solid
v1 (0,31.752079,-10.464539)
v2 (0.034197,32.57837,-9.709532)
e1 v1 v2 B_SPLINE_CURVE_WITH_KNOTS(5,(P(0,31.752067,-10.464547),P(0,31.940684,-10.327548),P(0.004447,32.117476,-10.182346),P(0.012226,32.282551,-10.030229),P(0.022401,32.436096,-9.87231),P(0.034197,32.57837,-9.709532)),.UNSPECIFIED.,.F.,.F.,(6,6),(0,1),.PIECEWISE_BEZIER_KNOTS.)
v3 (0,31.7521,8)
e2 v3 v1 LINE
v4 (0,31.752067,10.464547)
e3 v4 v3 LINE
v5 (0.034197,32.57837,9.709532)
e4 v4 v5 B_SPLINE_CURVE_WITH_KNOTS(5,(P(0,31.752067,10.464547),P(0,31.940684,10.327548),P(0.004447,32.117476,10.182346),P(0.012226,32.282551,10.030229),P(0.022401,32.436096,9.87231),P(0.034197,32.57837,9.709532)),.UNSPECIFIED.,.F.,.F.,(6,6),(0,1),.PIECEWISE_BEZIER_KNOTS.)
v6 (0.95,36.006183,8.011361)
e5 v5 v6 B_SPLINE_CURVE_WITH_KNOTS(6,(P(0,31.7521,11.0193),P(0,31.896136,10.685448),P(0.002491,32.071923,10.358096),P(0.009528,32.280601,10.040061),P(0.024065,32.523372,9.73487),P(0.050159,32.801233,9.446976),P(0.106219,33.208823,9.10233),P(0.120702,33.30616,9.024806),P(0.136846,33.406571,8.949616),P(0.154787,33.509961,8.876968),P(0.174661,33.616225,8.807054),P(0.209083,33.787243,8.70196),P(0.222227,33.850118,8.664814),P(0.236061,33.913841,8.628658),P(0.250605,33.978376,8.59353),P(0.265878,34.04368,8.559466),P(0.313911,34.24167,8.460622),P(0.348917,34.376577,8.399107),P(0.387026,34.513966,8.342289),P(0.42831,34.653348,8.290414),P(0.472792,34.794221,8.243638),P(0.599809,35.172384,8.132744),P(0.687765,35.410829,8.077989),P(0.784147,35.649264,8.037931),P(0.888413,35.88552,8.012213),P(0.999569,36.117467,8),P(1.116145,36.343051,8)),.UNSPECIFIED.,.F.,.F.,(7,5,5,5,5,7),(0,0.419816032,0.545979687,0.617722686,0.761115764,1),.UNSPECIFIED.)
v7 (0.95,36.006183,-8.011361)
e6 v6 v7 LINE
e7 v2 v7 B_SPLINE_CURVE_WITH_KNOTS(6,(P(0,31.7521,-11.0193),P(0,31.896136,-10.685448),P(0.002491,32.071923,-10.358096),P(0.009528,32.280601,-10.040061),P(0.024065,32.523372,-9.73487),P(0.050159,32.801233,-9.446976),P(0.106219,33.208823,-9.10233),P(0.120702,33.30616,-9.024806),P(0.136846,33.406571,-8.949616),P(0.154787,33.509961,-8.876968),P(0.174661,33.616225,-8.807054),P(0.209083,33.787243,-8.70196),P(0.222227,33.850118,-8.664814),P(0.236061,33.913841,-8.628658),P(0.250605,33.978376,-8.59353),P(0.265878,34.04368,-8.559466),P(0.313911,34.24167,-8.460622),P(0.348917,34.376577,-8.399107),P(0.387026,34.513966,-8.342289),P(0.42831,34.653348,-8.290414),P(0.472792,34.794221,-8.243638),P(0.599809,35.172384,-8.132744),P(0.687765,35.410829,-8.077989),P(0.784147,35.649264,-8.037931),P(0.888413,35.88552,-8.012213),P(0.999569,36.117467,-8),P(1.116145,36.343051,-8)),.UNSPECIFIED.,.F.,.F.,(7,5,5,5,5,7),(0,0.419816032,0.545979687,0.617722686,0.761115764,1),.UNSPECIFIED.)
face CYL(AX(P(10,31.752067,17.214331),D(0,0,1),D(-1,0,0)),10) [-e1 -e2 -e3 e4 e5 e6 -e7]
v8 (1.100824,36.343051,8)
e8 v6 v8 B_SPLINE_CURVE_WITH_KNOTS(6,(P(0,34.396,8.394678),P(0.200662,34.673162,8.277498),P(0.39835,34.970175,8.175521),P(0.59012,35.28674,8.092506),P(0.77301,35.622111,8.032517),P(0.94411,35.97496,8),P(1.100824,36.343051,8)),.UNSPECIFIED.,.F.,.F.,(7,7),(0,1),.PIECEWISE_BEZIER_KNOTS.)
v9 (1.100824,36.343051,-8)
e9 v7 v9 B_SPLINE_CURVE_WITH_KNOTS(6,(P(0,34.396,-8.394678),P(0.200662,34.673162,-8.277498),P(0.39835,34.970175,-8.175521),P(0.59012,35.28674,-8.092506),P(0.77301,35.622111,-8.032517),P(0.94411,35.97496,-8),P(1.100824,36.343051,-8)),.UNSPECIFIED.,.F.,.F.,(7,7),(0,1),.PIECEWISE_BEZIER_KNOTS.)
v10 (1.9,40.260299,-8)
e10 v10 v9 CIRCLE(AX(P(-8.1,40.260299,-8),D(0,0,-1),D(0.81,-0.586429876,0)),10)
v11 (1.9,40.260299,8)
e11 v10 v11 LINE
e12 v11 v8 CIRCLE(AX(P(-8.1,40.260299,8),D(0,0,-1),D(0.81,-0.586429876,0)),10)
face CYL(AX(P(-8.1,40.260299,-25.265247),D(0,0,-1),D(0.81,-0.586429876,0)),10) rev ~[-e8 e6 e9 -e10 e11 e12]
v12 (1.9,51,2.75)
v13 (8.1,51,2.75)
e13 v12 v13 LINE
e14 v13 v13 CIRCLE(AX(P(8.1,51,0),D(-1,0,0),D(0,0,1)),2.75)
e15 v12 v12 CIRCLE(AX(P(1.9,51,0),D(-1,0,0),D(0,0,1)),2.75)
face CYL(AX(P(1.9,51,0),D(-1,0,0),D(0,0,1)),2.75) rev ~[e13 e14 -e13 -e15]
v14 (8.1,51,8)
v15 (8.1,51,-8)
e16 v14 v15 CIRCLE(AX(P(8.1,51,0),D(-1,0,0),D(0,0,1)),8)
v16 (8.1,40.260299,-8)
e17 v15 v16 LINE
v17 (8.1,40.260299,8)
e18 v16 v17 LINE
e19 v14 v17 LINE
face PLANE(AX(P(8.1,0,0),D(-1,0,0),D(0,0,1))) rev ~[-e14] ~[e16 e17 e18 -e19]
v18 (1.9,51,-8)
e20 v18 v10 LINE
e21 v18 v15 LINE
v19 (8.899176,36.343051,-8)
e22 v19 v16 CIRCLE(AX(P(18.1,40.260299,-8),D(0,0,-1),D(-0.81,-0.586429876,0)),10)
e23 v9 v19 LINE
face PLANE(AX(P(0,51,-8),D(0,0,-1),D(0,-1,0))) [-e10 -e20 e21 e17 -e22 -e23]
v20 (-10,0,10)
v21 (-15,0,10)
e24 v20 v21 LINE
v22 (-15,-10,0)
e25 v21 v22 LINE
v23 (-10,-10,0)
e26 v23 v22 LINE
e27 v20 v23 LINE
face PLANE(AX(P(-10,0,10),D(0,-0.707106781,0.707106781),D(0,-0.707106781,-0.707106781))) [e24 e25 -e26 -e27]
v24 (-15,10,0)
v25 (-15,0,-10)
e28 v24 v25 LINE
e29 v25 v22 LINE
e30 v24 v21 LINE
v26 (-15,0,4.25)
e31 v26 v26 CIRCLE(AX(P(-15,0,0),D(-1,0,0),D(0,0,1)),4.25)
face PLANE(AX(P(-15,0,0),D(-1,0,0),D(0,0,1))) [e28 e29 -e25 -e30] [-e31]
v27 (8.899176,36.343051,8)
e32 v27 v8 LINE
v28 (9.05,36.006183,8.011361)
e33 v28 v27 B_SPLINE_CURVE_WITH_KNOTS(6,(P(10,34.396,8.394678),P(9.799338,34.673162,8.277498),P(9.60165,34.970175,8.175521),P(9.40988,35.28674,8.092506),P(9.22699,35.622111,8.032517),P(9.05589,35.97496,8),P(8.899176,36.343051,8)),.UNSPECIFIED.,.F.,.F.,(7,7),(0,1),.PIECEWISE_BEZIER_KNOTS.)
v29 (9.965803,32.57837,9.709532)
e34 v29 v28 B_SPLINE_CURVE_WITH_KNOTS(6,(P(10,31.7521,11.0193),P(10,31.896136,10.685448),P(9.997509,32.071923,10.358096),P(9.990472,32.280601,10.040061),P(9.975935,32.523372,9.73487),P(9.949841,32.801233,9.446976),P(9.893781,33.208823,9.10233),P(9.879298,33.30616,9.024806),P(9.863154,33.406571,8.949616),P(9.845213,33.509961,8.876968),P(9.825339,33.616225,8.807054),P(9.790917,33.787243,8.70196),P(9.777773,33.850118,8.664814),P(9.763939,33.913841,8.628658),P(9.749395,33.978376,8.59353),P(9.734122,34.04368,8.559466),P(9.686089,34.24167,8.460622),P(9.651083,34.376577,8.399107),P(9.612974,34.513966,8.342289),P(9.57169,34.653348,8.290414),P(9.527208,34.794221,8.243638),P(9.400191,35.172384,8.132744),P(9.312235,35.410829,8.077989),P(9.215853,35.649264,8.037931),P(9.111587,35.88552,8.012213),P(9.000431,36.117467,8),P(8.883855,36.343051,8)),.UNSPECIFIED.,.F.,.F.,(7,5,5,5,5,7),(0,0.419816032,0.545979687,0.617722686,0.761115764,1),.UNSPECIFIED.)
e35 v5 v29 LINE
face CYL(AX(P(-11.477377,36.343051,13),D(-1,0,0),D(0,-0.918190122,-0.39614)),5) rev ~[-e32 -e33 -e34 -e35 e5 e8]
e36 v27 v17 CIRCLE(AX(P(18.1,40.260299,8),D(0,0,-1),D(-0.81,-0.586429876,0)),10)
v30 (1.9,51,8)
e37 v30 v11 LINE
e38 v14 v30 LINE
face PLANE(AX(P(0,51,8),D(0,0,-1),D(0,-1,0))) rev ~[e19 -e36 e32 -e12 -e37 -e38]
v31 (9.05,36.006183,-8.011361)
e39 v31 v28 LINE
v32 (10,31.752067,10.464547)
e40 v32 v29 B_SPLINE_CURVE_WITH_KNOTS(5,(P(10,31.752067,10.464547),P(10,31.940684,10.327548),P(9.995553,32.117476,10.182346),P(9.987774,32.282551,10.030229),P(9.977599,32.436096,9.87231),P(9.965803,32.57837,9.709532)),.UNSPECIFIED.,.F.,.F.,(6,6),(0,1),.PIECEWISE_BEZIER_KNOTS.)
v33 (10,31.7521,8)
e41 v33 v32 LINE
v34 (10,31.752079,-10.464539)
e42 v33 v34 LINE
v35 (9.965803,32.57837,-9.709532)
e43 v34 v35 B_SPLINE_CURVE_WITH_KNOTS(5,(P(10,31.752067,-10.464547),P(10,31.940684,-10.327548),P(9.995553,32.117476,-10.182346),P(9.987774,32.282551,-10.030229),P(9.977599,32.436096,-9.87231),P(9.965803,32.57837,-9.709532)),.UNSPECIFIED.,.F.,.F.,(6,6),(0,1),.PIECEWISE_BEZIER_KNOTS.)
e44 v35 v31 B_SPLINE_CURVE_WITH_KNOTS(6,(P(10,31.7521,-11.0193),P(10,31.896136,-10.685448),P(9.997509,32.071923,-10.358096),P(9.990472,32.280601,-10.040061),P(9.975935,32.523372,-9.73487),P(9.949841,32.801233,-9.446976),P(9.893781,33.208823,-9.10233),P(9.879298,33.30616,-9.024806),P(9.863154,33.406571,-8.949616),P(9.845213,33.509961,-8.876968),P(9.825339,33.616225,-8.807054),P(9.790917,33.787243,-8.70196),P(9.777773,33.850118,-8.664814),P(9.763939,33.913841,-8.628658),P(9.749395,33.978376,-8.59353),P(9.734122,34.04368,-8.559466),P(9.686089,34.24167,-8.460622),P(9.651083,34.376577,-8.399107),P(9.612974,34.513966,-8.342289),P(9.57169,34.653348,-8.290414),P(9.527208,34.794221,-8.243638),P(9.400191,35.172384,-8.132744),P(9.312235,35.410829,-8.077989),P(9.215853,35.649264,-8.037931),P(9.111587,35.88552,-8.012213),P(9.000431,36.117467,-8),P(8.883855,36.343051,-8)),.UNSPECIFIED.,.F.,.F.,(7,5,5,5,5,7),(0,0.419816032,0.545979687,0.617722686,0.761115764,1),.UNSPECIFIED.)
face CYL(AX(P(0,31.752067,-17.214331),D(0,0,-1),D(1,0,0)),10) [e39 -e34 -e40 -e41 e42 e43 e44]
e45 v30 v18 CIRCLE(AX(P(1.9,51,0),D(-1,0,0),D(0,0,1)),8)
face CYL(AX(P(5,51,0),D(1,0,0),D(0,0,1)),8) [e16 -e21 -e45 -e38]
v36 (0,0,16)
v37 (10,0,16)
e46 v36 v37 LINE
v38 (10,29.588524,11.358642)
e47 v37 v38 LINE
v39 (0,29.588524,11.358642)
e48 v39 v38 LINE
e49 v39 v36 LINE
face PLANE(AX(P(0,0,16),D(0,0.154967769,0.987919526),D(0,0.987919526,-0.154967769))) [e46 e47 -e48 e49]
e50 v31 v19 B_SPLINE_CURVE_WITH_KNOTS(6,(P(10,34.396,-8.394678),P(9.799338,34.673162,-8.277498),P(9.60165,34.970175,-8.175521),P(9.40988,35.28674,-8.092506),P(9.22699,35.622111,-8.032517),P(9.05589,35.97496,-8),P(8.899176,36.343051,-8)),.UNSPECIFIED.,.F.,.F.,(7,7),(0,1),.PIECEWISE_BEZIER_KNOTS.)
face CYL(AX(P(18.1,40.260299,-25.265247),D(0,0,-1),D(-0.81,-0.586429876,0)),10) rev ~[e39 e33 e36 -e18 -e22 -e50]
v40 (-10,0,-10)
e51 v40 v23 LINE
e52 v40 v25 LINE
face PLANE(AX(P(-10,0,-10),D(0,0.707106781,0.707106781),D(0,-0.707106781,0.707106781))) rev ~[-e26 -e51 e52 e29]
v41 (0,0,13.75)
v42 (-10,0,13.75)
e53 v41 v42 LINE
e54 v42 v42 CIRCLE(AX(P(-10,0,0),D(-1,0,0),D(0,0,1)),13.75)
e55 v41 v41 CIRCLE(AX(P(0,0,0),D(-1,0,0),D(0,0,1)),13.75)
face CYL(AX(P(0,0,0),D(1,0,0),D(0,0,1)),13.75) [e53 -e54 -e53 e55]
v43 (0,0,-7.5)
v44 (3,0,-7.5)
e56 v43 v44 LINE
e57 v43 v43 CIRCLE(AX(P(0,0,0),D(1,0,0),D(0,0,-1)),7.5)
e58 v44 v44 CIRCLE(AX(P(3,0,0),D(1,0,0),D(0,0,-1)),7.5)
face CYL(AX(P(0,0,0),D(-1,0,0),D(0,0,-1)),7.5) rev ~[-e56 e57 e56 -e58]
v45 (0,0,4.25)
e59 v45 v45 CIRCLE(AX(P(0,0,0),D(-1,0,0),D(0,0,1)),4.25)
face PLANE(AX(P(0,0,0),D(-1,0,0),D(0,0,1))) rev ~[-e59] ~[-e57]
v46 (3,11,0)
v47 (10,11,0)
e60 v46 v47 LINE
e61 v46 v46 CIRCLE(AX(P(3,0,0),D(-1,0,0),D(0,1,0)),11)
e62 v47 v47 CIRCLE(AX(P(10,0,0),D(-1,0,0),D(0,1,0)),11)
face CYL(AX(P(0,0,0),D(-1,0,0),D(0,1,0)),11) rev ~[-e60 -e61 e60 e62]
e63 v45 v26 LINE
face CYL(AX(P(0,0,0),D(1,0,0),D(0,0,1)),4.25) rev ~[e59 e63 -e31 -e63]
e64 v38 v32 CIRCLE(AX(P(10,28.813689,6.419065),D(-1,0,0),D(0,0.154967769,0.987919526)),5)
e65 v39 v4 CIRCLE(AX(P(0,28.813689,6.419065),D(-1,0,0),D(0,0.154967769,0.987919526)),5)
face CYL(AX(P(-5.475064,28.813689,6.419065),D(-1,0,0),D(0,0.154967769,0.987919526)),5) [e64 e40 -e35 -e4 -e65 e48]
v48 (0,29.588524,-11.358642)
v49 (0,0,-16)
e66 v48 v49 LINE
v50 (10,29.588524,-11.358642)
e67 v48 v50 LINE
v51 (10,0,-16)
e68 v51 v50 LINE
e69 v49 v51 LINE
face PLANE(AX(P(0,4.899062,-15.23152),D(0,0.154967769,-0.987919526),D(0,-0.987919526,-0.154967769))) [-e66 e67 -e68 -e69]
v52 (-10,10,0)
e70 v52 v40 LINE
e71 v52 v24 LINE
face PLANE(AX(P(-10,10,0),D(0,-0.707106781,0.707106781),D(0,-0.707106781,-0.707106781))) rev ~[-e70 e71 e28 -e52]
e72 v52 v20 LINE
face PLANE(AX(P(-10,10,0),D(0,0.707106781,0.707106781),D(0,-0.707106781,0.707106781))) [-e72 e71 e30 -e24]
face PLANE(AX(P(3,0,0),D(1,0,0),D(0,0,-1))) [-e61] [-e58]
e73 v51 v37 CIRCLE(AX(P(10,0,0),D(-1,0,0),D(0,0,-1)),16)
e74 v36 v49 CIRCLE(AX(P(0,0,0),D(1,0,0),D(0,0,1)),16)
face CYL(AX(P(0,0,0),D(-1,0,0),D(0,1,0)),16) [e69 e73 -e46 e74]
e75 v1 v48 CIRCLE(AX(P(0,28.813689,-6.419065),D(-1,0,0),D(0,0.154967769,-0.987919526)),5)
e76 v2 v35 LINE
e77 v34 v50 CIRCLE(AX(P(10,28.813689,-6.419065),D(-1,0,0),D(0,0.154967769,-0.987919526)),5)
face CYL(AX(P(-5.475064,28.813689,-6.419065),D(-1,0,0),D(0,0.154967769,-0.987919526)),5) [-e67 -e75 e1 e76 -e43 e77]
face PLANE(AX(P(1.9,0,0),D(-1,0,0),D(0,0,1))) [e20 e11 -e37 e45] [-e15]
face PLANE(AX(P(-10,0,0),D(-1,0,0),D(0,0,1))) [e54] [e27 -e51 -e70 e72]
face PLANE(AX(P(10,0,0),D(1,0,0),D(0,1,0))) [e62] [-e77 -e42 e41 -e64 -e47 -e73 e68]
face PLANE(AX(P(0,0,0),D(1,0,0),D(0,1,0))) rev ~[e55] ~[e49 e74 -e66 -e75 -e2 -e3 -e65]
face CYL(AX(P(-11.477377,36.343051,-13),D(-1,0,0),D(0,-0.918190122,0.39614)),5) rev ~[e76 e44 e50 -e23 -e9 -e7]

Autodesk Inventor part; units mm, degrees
ref_plane "YZ Plane" through (0, 0, 0) normal (1, 0, 0) x (0, 1, 0)
ref_plane "XZ Plane" through (0, 0, 0) normal (0, 1, 0) x (-1, 0, 0)
sketch "Esquisse1" plane through (0, 0, 0) normal (1, 0, 0) x (0, 1, 0)
  circle A0 centre (0, 0) radius 16
  line L0 (-16, 0) -> (59, 0)
  line L1 (59, 0) -> (51, 0)
  circle A1 centre (51, 0) radius 5
  circle A2 centre (51, 0) radius 8
  line L2 (0, 16) -> (51, 8)
  line L3 (51, -8) -> (0, -16)
  circle A3 centre (0, 0) radius 11
  line L4 (34.396, -10.6045) -> (34.396, 10.6045)
  dimension "d0" = 32
  dimension "d1" = 75
  dimension "d2" = 8
  dimension "d3" = 10
  dimension "d4" = 16
  dimension "d5" = 22
extrude "Extrusion1" add sketch "Esquisse1" along normal blind 10 contours L2 A0 L0 A3 | L0 A3 A0 L3 | L2 L4 L0 A0 | L0 L4 L3 A0
sketch "Esquisse2" plane through (0, 0, 0) normal (-1, 0, 0) x (0, 0, 1)
  circle A0 centre (0, 0) radius 11
  circle A1 centre (0, 0) radius 4.25
  dimension "d8" = 8.5
extrude "Extrusion2" add sketch "Esquisse2" along normal blind 10
sketch "Esquisse3" plane through (-10, 0, 0) normal (-1, 0, 0) x (0, 0, 1)
  line L0 (0, 0) -> (-10, 0)
  circle A0 centre (0, 0) radius 11 projected
  line L1 (0, 0) -> (0, 10)
  circle A1 centre (0, 0) radius 4.25 projected
  line L2 (0, 0) -> (10, 0)
  line L3 (0, 0) -> (0, -10)
  line L4 (0, 10) -> (-10, 0)
  line L5 (0, 10) -> (10, 0)
  line L6 (10, 0) -> (0, -10)
  line L7 (-10, 0) -> (0, -10)
  circle A2 centre (0, 0) radius 4.25
  dimension "d12" = 10
  dimension "d13" = 10
  dimension "d14" = 10
  dimension "d15" = 10
  dimension "d16" = 8.5
extrude "Extrusion3" add sketch "Esquisse3" along normal blind 5 contours A1 L3 L7 L0 | L0 L4 L1 A1 | L1 L5 L2 A1 | L2 L6 L3 A1
sketch "Esquisse4" plane through (0, 0, 0) normal (-1, 0, 0) x (0, 0, 1)
  circle A0 centre (0, 0) radius 13.75
  circle A1 centre (0, 0) radius 11
  dimension "d19" = 27.5
extrude "Extrusion4" add sketch "Esquisse4" along normal up to surface (10 mm away)
ref_plane "Plan de construction1" through (5, 0, 0) normal (-1, 0, 0) x (0, 0, 1)
sketch "Esquisse7" plane through (5, 0, 0) normal (-1, 0, 0) x (0, 0, 1)
  point P0 (0, 0)
sketch "Esquisse8" plane through (5, 0, 0) normal (-1, 0, 0) x (0, 0, 1)
  circle A0 centre (0, 51) radius 5 projected
  circle A1 centre (0, 51) radius 4.25 projected
  line L0 (-16, 0) -> (-10.6045, 34.396) projected
  line L1 (10.6045, 34.396) -> (16, 0) projected
  arc A2 (8, 51) -> (-8, 51) centre (0, 51) ccw projected
  line L2 (-10.6045, 34.396) -> (10.6045, 34.396) projected
  line L3 (-10.6045, 34.396) -> (-8, 51)
  line L4 (8, 51) -> (10.6045, 34.396)
  line L5 (10.6045, 34.396) -> (-10.6045, 34.396)
  point P0 (0, 0)
extrude "Extrusion6" add sketch "Esquisse8" along normal mid plane 6.2 contours A0 | L4 L2 L3 A2
fillet "Congé1" radius 10 4 edges at (8.1, 34.396, 0) (1.9, 34.396, 0) (10, 34.396, 0) (0, 34.396, 0)
sketch "Esquisse10" plane through (0, 0, 0) normal (-1, 0, 0) x (0, 0, 1)
  line L0 (-11.0193, 31.7521) -> (11.0193, 31.7521) projected
  line L1 (-11.0193, 31.7521) -> (11.0193, 31.7521)
  arc A0 (8, 51) -> (-8, 51) centre (0, 51) ccw projected
  line L2 (-8, 51) -> (-8, 31.7521)
  line L3 (9.6847, 40.2603) -> (8, 51) projected
  line L4 (8, 51) -> (8, 31.7521)
  arc A1 (8, 51) -> (-8, 51) centre (0, 51) ccw
  line L5 (-11.0193, 31.7521) -> (-8, 51)
  line L6 (8, 51) -> (11.0193, 31.7521)
  point P0 (0, 0)
extrude "Extrusion8" cut sketch "Esquisse10" against normal blind 10 contours L5 L2 L0 | L4 L3 L6 L0
fillet "Congé2" radius 5 2 edges at (5, 31.7521, -8) (5, 31.7521, -11.0193)
fillet "Congé3" radius 5 2 edges at (5, 31.7521, 11.0193) (5, 31.7521, 8)
sketch "Esquisse11" plane through (0, 0, 0) normal (1, 0, 0) x (0, 0, -1)
  circle A0 centre (0, 0) radius 11 projected
  circle A1 centre (0, 0) radius 7.5
  dimension "d45" = 15
extrude "Extrusion9" add sketch "Esquisse11" along normal blind 3
sketch "Esquisse13" plane through (1.9, 0, 0) normal (-1, 0, 0) x (0, 0, 1)
  circle A0 centre (0, 51) radius 4.25 projected
  circle A1 centre (0, 51) radius 2.75
  point P0 (0, 0)
  dimension "d51" = 5.5
extrude "Extrusion11" add sketch "Esquisse13" against normal up to surface (6.2 mm away)
properties part number "bièlle côté"
